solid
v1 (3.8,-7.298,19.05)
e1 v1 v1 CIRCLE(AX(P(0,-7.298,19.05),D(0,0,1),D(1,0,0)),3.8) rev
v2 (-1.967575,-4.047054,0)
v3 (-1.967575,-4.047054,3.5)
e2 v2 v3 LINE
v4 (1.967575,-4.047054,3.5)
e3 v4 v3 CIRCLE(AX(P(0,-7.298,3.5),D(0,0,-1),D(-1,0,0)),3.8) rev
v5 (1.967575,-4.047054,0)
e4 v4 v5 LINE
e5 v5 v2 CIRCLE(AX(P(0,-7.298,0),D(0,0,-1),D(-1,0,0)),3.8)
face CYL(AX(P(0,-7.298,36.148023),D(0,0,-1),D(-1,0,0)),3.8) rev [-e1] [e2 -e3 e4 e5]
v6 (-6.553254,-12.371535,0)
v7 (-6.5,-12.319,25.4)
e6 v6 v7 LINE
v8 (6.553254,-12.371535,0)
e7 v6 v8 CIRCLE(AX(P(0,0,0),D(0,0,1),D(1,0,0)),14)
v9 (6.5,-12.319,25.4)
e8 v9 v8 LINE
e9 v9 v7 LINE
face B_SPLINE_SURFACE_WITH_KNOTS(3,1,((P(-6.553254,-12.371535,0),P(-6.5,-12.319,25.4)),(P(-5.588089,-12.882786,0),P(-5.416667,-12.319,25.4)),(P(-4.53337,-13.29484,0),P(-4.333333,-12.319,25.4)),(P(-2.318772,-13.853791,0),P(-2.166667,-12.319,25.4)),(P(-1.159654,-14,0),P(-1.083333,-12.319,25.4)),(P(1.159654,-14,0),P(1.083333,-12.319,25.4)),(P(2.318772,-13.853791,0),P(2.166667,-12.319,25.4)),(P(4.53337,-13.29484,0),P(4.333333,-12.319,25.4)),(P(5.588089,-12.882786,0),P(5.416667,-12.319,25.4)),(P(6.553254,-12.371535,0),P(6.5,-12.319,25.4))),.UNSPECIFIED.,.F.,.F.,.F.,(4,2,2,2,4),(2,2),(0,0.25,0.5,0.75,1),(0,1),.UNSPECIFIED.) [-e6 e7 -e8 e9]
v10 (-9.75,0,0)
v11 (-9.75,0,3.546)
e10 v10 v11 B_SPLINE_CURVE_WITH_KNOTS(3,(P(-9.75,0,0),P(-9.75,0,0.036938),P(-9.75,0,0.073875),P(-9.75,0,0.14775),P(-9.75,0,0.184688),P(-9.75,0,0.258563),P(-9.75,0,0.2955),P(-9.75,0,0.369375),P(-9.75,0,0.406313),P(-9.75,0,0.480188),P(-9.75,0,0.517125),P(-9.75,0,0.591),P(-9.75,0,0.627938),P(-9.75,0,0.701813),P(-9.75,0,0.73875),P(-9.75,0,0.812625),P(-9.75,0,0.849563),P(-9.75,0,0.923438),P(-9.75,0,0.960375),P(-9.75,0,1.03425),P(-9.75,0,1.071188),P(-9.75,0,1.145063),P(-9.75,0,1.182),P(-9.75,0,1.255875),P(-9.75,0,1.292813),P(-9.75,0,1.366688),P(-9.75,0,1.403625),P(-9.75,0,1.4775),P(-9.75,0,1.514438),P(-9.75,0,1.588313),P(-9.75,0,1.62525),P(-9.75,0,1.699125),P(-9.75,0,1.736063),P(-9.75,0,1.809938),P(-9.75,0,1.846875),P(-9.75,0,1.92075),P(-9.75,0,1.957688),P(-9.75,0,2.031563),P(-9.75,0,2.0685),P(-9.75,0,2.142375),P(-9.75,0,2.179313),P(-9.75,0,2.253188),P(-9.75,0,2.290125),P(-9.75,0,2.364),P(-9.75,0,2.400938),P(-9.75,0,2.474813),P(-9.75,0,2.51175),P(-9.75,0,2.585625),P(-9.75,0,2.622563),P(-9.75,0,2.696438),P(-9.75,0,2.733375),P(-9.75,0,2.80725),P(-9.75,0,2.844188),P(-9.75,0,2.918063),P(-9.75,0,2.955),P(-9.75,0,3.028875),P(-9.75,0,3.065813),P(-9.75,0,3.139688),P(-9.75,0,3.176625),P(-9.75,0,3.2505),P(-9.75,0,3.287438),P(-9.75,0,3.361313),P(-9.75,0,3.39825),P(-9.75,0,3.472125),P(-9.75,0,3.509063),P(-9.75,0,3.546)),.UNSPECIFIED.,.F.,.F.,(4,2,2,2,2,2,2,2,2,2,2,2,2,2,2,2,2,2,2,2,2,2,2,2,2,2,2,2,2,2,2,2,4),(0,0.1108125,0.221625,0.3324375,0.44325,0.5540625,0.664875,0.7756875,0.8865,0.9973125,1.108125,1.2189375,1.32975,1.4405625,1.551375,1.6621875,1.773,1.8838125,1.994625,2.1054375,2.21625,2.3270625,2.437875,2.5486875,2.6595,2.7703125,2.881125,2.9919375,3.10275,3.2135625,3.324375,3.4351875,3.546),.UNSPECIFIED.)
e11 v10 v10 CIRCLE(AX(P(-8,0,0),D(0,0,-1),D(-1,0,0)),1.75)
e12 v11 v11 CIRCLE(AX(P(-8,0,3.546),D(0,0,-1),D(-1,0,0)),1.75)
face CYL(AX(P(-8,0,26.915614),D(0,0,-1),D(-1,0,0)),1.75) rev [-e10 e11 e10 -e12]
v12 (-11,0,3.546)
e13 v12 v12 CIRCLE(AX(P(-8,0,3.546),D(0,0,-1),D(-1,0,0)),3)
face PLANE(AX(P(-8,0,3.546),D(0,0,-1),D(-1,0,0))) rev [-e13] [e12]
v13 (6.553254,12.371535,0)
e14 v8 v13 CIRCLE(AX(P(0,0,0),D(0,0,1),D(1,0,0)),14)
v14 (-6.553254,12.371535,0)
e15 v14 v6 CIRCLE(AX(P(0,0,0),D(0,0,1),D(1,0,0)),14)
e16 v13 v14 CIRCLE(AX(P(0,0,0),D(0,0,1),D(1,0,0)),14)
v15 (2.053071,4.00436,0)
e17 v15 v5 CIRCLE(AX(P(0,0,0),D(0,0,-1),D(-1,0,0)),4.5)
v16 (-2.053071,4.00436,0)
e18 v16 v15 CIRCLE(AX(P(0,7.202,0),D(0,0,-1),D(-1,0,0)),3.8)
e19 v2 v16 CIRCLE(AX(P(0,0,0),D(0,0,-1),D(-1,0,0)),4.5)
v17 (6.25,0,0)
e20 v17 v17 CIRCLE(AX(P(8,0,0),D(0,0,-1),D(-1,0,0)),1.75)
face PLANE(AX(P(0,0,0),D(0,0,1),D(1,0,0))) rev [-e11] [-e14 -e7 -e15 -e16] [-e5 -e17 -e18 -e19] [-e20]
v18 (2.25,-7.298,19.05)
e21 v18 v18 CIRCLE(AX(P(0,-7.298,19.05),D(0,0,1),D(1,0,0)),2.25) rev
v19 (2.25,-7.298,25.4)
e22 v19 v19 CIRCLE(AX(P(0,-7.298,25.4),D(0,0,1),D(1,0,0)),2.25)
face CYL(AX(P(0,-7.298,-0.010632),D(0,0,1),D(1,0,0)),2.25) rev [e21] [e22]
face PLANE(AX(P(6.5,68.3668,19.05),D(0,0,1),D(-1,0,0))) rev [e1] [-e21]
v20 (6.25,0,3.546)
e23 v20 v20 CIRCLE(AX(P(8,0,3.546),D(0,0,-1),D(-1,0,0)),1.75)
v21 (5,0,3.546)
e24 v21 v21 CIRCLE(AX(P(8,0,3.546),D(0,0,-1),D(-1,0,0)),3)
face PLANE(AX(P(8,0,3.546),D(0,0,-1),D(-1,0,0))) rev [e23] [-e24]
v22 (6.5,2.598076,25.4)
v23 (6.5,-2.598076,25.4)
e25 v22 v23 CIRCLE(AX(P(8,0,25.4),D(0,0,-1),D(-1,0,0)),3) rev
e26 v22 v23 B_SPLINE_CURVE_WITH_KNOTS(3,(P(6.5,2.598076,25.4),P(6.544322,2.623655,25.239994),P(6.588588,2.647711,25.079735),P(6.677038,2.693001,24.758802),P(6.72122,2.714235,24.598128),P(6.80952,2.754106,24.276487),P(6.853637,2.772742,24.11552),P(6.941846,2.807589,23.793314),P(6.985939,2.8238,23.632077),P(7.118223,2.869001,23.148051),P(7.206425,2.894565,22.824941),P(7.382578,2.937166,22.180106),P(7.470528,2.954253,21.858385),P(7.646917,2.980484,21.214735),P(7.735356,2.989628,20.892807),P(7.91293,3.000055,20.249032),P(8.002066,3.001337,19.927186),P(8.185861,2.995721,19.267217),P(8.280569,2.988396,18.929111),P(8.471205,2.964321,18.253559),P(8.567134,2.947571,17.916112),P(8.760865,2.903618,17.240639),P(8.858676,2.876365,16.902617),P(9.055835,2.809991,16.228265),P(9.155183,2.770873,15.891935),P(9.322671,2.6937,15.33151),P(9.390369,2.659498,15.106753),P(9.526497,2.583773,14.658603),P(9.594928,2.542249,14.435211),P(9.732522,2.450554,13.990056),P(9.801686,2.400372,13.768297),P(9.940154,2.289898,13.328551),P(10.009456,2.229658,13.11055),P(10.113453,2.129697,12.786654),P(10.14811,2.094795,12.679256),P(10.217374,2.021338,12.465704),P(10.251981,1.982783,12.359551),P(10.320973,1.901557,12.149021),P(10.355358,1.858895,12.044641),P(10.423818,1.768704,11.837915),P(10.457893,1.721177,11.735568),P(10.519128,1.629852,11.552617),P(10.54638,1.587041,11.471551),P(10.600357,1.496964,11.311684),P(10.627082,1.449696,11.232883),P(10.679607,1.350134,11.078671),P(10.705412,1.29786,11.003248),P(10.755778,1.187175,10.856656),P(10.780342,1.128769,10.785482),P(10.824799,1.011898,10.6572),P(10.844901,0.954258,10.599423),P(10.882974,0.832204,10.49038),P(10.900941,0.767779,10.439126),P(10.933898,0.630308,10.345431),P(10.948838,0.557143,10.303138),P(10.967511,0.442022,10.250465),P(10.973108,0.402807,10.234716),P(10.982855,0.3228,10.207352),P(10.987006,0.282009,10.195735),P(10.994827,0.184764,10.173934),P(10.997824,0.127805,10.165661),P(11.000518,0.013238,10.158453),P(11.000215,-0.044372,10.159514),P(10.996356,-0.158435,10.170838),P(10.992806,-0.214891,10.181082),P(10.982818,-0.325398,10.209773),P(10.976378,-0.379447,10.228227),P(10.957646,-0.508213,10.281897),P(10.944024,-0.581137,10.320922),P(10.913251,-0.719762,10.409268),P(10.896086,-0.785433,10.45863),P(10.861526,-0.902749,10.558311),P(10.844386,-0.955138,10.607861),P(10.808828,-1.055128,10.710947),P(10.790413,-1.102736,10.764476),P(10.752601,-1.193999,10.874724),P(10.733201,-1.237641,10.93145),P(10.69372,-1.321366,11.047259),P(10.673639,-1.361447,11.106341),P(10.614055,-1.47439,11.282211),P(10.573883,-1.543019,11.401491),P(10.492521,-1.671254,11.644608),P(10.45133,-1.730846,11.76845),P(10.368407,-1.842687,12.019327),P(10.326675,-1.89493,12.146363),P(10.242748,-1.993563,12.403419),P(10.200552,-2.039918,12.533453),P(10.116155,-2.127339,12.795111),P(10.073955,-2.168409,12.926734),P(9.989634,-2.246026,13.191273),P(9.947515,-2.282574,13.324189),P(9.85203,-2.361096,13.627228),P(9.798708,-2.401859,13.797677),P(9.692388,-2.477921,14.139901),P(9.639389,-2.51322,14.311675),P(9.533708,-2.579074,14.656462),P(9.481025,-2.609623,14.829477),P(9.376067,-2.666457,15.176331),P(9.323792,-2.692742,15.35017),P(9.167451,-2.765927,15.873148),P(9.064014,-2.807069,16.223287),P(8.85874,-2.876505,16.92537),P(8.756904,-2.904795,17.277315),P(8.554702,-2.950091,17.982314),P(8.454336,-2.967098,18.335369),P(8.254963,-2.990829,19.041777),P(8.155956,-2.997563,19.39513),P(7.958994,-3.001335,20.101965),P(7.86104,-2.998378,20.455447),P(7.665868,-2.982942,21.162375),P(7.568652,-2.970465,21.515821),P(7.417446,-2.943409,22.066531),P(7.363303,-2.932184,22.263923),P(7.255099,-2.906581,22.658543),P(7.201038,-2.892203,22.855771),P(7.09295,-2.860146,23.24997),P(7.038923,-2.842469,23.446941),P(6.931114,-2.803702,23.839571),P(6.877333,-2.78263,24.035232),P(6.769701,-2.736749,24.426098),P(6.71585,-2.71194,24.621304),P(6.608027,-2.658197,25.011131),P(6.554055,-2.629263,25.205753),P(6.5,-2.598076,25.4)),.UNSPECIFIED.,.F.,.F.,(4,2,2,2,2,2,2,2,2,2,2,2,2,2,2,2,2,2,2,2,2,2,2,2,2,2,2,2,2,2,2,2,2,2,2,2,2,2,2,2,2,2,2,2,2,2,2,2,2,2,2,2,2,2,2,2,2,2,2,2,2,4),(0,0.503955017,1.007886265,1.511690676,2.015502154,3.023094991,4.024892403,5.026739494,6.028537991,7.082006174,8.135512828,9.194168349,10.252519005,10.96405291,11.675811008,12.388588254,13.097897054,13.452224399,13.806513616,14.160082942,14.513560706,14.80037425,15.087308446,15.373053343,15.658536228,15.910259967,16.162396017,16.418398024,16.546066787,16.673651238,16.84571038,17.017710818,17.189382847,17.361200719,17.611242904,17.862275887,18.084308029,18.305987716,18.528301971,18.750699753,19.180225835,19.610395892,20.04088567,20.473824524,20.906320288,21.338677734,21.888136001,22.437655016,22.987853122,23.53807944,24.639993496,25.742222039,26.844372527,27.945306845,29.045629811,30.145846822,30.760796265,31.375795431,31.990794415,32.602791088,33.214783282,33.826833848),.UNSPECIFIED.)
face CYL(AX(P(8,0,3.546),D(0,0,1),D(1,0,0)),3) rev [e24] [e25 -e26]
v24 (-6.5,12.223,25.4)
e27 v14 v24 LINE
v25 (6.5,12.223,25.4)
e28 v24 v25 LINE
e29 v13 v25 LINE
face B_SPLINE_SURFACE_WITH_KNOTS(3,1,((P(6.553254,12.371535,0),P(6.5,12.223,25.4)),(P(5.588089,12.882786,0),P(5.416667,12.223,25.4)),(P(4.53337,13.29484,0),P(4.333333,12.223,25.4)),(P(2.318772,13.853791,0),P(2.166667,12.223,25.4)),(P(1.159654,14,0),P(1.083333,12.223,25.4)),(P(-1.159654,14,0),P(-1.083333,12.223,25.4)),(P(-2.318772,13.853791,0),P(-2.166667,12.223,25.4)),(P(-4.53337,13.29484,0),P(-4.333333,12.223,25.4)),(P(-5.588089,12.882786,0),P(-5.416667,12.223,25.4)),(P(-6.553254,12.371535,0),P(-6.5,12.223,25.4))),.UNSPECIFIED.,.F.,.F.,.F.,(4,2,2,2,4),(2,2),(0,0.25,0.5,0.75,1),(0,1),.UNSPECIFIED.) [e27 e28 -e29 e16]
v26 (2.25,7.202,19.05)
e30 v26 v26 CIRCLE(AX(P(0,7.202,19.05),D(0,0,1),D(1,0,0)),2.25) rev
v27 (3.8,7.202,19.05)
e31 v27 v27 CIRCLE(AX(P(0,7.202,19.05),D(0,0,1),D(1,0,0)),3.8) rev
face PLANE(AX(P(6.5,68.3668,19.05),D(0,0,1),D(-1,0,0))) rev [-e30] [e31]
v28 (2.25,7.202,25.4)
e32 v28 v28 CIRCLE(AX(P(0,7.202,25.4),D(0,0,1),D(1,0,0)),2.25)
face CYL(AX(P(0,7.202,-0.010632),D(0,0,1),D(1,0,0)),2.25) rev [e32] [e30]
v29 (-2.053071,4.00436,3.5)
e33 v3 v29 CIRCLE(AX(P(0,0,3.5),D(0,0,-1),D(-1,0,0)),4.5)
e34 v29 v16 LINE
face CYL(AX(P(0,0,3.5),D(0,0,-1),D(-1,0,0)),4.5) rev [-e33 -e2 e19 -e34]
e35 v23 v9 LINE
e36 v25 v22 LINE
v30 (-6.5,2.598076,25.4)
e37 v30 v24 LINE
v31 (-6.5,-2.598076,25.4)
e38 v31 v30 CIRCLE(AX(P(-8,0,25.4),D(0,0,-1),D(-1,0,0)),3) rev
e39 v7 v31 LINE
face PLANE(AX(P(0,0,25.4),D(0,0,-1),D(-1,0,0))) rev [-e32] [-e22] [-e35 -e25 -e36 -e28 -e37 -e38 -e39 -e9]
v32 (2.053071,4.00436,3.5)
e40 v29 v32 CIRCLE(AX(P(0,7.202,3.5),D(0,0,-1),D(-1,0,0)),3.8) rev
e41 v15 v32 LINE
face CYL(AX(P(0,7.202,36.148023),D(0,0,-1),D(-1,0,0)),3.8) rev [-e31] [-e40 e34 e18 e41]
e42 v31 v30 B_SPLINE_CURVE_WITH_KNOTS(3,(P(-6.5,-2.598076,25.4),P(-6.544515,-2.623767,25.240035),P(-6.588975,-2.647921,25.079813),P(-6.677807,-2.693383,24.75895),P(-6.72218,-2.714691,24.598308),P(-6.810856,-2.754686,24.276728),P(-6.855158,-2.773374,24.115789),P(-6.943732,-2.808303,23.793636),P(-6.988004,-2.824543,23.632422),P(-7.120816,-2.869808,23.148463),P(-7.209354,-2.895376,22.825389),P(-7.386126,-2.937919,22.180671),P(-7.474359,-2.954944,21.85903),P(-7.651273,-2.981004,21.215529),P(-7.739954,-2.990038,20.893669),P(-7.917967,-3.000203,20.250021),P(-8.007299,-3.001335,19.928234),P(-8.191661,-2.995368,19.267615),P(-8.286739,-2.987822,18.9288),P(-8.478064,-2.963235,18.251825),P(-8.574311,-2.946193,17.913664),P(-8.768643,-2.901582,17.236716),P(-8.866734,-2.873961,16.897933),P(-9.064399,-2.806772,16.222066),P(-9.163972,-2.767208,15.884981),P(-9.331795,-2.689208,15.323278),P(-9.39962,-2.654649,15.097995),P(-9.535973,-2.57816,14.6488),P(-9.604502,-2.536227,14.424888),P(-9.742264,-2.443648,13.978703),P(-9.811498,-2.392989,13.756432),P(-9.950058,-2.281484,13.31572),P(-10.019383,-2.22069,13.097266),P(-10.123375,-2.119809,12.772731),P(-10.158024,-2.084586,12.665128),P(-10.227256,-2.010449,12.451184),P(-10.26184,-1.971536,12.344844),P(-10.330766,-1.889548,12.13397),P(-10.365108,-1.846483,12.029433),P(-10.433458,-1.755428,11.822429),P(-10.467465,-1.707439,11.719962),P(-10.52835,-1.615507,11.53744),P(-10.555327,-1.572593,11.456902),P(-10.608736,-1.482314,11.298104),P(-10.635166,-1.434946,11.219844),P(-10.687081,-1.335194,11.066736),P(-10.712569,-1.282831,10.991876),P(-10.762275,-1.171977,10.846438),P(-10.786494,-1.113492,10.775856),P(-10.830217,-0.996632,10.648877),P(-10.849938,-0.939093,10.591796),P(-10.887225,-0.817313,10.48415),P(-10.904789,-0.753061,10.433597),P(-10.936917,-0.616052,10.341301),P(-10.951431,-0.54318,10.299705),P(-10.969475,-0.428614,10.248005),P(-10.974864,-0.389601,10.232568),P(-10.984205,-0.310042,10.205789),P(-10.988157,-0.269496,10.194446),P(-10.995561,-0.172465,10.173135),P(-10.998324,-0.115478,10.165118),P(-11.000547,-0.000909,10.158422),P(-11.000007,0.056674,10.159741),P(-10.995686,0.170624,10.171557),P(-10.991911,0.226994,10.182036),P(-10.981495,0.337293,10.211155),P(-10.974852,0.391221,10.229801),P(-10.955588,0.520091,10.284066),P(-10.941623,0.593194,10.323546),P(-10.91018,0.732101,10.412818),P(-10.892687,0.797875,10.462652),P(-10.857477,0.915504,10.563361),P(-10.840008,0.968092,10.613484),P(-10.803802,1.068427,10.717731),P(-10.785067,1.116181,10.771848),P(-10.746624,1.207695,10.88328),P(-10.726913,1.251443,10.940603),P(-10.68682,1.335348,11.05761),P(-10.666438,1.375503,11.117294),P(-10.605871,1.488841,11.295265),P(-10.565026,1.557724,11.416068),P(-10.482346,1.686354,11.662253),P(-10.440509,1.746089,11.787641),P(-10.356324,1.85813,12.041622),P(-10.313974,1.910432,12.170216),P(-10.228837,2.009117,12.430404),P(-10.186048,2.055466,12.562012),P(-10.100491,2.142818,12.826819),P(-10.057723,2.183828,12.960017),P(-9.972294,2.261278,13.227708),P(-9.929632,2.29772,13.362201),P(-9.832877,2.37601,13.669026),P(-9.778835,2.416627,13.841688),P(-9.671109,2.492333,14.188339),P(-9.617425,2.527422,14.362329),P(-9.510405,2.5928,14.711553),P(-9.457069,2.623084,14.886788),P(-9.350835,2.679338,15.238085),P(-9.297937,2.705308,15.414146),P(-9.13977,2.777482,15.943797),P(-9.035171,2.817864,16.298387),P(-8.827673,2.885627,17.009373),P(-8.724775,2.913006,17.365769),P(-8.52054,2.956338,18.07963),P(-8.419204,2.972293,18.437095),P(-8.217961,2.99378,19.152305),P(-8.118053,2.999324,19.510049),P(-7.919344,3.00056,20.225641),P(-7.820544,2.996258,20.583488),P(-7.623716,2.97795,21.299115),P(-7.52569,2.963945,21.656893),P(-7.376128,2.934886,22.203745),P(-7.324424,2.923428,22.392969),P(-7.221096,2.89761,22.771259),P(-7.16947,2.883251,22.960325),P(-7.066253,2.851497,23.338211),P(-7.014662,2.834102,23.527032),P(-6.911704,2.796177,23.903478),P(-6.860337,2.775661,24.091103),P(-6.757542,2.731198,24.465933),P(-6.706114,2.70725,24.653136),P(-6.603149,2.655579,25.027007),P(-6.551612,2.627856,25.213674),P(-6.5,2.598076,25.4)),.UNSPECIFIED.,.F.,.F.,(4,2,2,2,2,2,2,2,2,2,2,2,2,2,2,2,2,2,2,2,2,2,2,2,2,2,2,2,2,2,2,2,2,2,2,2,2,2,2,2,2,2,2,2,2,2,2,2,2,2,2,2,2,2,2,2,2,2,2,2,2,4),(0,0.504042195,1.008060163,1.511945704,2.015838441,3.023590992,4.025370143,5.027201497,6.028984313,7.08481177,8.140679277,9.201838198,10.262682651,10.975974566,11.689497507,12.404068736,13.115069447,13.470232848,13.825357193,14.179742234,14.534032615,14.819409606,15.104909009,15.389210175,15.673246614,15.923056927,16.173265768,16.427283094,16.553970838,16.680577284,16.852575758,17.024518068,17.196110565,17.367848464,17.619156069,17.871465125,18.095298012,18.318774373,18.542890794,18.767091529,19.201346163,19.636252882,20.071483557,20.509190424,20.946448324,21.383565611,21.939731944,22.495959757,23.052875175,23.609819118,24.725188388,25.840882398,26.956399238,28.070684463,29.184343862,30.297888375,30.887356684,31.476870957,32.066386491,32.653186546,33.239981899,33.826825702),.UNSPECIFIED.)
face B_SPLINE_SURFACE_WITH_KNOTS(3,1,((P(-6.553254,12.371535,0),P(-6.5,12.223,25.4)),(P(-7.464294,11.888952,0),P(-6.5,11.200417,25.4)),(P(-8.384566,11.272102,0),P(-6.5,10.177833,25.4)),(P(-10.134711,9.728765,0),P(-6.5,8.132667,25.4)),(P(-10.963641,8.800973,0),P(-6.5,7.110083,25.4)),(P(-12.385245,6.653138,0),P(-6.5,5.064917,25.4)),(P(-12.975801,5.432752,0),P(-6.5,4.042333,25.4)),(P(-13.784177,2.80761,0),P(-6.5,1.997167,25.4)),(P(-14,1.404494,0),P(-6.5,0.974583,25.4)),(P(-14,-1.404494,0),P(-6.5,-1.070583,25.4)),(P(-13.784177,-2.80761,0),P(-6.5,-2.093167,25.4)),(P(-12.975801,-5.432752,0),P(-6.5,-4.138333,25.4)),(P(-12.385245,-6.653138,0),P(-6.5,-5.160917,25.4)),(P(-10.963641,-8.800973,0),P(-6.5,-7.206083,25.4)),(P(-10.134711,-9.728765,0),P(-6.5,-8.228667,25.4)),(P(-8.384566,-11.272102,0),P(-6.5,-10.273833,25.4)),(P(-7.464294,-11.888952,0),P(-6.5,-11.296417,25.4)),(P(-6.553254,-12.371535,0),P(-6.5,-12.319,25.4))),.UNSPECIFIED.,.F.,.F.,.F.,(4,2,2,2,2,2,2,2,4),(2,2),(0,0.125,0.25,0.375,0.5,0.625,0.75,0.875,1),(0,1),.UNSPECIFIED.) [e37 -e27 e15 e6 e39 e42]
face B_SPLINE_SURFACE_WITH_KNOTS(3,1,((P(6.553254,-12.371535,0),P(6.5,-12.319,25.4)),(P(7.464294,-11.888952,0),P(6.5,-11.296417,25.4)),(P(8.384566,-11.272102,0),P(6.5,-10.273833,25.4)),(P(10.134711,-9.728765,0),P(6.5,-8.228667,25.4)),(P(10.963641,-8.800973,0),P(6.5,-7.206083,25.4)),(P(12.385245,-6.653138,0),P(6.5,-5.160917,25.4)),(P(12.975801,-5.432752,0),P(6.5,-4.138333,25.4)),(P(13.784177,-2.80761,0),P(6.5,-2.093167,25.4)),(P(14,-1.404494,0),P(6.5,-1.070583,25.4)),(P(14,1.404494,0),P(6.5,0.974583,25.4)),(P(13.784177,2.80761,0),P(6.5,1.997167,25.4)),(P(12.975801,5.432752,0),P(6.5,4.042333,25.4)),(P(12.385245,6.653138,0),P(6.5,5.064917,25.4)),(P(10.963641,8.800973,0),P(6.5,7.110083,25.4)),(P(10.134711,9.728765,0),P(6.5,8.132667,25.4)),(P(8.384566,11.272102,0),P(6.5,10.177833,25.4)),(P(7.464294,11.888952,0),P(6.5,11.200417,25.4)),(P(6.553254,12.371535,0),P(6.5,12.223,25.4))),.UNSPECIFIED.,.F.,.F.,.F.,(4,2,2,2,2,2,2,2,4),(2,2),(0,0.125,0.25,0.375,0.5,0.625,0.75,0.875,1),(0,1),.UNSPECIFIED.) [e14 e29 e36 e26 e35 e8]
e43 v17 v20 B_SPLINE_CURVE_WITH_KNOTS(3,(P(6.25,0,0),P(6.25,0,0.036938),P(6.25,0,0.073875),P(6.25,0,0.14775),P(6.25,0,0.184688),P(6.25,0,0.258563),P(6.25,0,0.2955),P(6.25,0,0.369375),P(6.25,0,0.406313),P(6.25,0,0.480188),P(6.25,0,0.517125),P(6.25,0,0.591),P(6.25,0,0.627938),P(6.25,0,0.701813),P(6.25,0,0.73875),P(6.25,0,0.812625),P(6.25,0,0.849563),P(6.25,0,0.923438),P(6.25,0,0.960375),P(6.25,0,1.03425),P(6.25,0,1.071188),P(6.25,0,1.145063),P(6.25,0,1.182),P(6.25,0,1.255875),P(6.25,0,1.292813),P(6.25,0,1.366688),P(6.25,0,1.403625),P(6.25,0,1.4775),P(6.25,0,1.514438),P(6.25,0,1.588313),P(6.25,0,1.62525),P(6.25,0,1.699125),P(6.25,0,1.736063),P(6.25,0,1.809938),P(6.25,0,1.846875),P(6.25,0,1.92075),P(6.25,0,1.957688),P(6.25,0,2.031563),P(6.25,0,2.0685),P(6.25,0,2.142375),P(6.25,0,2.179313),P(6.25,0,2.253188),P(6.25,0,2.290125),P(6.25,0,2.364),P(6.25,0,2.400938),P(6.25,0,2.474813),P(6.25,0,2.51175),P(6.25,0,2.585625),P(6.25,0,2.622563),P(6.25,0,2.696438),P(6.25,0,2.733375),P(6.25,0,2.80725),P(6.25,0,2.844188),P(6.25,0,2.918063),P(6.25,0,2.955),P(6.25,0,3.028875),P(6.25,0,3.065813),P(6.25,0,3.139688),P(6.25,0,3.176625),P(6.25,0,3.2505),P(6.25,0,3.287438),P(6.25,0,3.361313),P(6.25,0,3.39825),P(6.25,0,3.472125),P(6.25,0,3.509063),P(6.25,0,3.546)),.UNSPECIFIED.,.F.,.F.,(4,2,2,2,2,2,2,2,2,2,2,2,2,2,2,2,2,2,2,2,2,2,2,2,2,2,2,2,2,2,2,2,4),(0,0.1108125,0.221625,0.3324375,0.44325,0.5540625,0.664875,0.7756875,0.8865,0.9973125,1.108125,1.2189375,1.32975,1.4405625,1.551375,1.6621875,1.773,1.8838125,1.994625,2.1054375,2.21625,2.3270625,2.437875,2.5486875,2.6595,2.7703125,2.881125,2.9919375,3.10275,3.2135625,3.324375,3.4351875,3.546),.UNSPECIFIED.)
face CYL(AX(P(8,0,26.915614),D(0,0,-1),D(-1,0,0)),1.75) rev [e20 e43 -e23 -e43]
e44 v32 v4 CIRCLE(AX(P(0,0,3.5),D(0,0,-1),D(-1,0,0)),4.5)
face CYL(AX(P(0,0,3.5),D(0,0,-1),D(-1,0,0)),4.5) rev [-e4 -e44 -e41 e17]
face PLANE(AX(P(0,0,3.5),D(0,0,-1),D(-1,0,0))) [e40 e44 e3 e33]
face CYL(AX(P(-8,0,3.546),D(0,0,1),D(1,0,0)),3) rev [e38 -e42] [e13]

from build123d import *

# Parameters (mm, degrees)
CUT_EXTRUDE1_DEPTH      = 0.254
CUT_EXTRUDE1_DEPTH_BACK = 29.404968727
CUT_EXTRUDE1_START      = -3.8
SKETCH5_R               = 2.999999969
SKETCH5_R_2             = 3
SKETCH6_R               = 1.75
CUT_EXTRUDE2_DEPTH      = 33.204968727
SKETCH7_R               = 2.25
SKETCH7_R_2             = 2.249999945
CUT_EXTRUDE3_DEPTH      = 33.204968727
SKETCH8_R               = 3.8
CUT_EXTRUDE4_DEPTH      = 19.05
SKETCH9_R               = 4.5
CUT_EXTRUDE5_DEPTH      = 3.5


with BuildPart() as part:
    # Loft1: read off the stored shape, not the designer's step
    # Loft1: loft between two sections, ruled curve by curve
    loft1_from = [
        Edge.make_bspline([(6.55325358, -12.371534566, 0), (7.464294458, -11.888952404, 0), (8.384566214, -11.272101526, 0), (10.134710604, -9.728764793, 0), (10.963640628, -8.800972824, 0), (12.385245025, -6.653137916, 0), (12.975801321, -5.432751611, 0), (13.784177023, -2.807609973, 0), (14, -1.404493643, 0), (14, 1.404493643, 0), (13.784177023, 2.807609973, 0), (12.975801321, 5.432751611, 0), (12.385245025, 6.653137916, 0), (10.963640628, 8.800972824, 0), (10.134710604, 9.728764793, 0), (8.384566214, 11.272101526, 0), (7.464294458, 11.888952404, 0), (6.55325358, 12.371534566, 0)], [0, 0, 0, 0, 0.125, 0.125, 0.25, 0.25, 0.375, 0.375, 0.5, 0.5, 0.625, 0.625, 0.75, 0.75, 0.875, 0.875, 1, 1, 1, 1], 3),
        Edge.make_bspline([(6.55325358, 12.371534566, 0), (5.588089256, 12.882786143, 0), (4.533369794, 13.294840206, 0), (2.318771517, 13.853790689, 0), (1.159653791, 14, 0), (-1.159653791, 14, 0), (-2.318771517, 13.853790689, 0), (-4.533369794, 13.294840206, 0), (-5.588089256, 12.882786143, 0), (-6.55325358, 12.371534566, 0)], [0, 0, 0, 0, 0.25, 0.25, 0.5, 0.5, 0.75, 0.75, 1, 1, 1, 1], 3),
        Edge.make_bspline([(-6.55325358, -12.371534566, 0), (-5.588089256, -12.882786143, 0), (-4.533369794, -13.294840206, 0), (-2.318771517, -13.853790689, 0), (-1.159653791, -14, 0), (1.159653791, -14, 0), (2.318771517, -13.853790689, 0), (4.533369794, -13.294840206, 0), (5.588089256, -12.882786143, 0), (6.55325358, -12.371534566, 0)], [0, 0, 0, 0, 0.25, 0.25, 0.5, 0.5, 0.75, 0.75, 1, 1, 1, 1], 3),
        Edge.make_bspline([(-6.55325358, 12.371534566, 0), (-7.464294458, 11.888952404, 0), (-8.384566214, 11.272101526, 0), (-10.134710604, 9.728764793, 0), (-10.963640628, 8.800972824, 0), (-12.385245025, 6.653137916, 0), (-12.975801321, 5.432751611, 0), (-13.784177023, 2.807609973, 0), (-14, 1.404493643, 0), (-14, -1.404493643, 0), (-13.784177023, -2.807609973, 0), (-12.975801321, -5.432751611, 0), (-12.385245025, -6.653137916, 0), (-10.963640628, -8.800972824, 0), (-10.134710604, -9.728764793, 0), (-8.384566214, -11.272101526, 0), (-7.464294458, -11.888952404, 0), (-6.55325358, -12.371534566, 0)], [0, 0, 0, 0, 0.125, 0.125, 0.25, 0.25, 0.375, 0.375, 0.5, 0.5, 0.625, 0.625, 0.75, 0.75, 0.875, 0.875, 1, 1, 1, 1], 3),
    ]
    loft1_to = [
        Edge.make_bspline([(6.5, -12.319, 25.4), (6.5, -11.296416667, 25.4), (6.5, -10.273833333, 25.4), (6.5, -8.228666667, 25.4), (6.5, -7.206083333, 25.4), (6.5, -5.160916667, 25.4), (6.5, -4.138333333, 25.4), (6.5, -2.093166667, 25.4), (6.5, -1.070583333, 25.4), (6.5, 0.974583333, 25.4), (6.5, 1.997166667, 25.4), (6.5, 4.042333333, 25.4), (6.5, 5.064916667, 25.4), (6.5, 7.110083333, 25.4), (6.5, 8.132666667, 25.4), (6.5, 10.177833333, 25.4), (6.5, 11.200416667, 25.4), (6.5, 12.223, 25.4)], [0, 0, 0, 0, 0.125, 0.125, 0.25, 0.25, 0.375, 0.375, 0.5, 0.5, 0.625, 0.625, 0.75, 0.75, 0.875, 0.875, 1, 1, 1, 1], 3),
        Edge.make_bspline([(6.5, 12.223, 25.4), (5.416666667, 12.223, 25.4), (4.333333333, 12.223, 25.4), (2.166666667, 12.223, 25.4), (1.083333333, 12.223, 25.4), (-1.083333333, 12.223, 25.4), (-2.166666667, 12.223, 25.4), (-4.333333333, 12.223, 25.4), (-5.416666667, 12.223, 25.4), (-6.5, 12.223, 25.4)], [0, 0, 0, 0, 0.25, 0.25, 0.5, 0.5, 0.75, 0.75, 1, 1, 1, 1], 3),
        Edge.make_bspline([(-6.5, -12.319, 25.4), (-5.416666667, -12.319, 25.4), (-4.333333333, -12.319, 25.4), (-2.166666667, -12.319, 25.4), (-1.083333333, -12.319, 25.4), (1.083333333, -12.319, 25.4), (2.166666667, -12.319, 25.4), (4.333333333, -12.319, 25.4), (5.416666667, -12.319, 25.4), (6.5, -12.319, 25.4)], [0, 0, 0, 0, 0.25, 0.25, 0.5, 0.5, 0.75, 0.75, 1, 1, 1, 1], 3),
        Edge.make_bspline([(-6.5, 12.223, 25.4), (-6.5, 11.200416667, 25.4), (-6.5, 10.177833333, 25.4), (-6.5, 8.132666667, 25.4), (-6.5, 7.110083333, 25.4), (-6.5, 5.064916667, 25.4), (-6.5, 4.042333333, 25.4), (-6.5, 1.997166667, 25.4), (-6.5, 0.974583333, 25.4), (-6.5, -1.070583333, 25.4), (-6.5, -2.093166667, 25.4), (-6.5, -4.138333333, 25.4), (-6.5, -5.160916667, 25.4), (-6.5, -7.206083333, 25.4), (-6.5, -8.228666667, 25.4), (-6.5, -10.273833333, 25.4), (-6.5, -11.296416667, 25.4), (-6.5, -12.319, 25.4)], [0, 0, 0, 0, 0.125, 0.125, 0.25, 0.25, 0.375, 0.375, 0.5, 0.5, 0.625, 0.625, 0.75, 0.75, 0.875, 0.875, 1, 1, 1, 1], 3),
    ]
    loft1 = Solid(Shell([*[Face.make_surface_from_curves(loft1_from[k], loft1_to[k]) for k in range(4)], Face(Wire(loft1_from)), Face(Wire(loft1_to))]))
    add(loft1)

    # Sketch5 → Cut-Extrude1 (cut, two sides: drawn at the far end of the back side and taken through both)
    with BuildSketch(Plane(origin=(0, 0, 0), x_dir=(-1, 0, 0), z_dir=(0, 0, -1)).offset(CUT_EXTRUDE1_START - CUT_EXTRUDE1_DEPTH_BACK)):
        with Locations(Location((-8, 0, 0), (0, 0, 300.000000342))):
            Circle(SKETCH5_R)
        with Locations(Location((8, 0, 0), (0, 0, 240))):
            Circle(SKETCH5_R_2)
    extrude(amount=CUT_EXTRUDE1_DEPTH + CUT_EXTRUDE1_DEPTH_BACK, mode=Mode.SUBTRACT)

    # Sketch6 → Cut-Extrude2 (cut, through all)
    with BuildSketch(Plane(origin=(0, 0, 0), x_dir=(-1, 0, 0), z_dir=(0, 0, -1))):
        with Locations((-8, 0)):
            Circle(SKETCH6_R)
        with Locations((8, 0)):
            Circle(SKETCH6_R)
    extrude(amount=-CUT_EXTRUDE2_DEPTH, mode=Mode.SUBTRACT)

    # Sketch7 → Cut-Extrude3 (cut, through all)
    with BuildSketch(Plane.XY.offset(25.4)):
        with Locations((0, -7.298)):
            Circle(SKETCH7_R)
        with Locations((0, 7.202)):
            Circle(SKETCH7_R_2)
    extrude(amount=-CUT_EXTRUDE3_DEPTH, mode=Mode.SUBTRACT)

    # Sketch8 → Cut-Extrude4 (cut)
    with BuildSketch(Plane(origin=(0, 0, 0), x_dir=(-1, 0, 0), z_dir=(0, 0, -1))):
        with Locations((0, -7.298)):
            Circle(SKETCH8_R)
        with Locations((0, 7.202)):
            Circle(SKETCH8_R)
    extrude(amount=-CUT_EXTRUDE4_DEPTH, mode=Mode.SUBTRACT)

    # Sketch9 → Cut-Extrude5 (cut)
    with BuildSketch(Plane(origin=(0, 0, 0), x_dir=(-1, 0, 0), z_dir=(0, 0, -1))):
        Circle(SKETCH9_R)
    extrude(amount=-CUT_EXTRUDE5_DEPTH, mode=Mode.SUBTRACT)


solid = part.part
